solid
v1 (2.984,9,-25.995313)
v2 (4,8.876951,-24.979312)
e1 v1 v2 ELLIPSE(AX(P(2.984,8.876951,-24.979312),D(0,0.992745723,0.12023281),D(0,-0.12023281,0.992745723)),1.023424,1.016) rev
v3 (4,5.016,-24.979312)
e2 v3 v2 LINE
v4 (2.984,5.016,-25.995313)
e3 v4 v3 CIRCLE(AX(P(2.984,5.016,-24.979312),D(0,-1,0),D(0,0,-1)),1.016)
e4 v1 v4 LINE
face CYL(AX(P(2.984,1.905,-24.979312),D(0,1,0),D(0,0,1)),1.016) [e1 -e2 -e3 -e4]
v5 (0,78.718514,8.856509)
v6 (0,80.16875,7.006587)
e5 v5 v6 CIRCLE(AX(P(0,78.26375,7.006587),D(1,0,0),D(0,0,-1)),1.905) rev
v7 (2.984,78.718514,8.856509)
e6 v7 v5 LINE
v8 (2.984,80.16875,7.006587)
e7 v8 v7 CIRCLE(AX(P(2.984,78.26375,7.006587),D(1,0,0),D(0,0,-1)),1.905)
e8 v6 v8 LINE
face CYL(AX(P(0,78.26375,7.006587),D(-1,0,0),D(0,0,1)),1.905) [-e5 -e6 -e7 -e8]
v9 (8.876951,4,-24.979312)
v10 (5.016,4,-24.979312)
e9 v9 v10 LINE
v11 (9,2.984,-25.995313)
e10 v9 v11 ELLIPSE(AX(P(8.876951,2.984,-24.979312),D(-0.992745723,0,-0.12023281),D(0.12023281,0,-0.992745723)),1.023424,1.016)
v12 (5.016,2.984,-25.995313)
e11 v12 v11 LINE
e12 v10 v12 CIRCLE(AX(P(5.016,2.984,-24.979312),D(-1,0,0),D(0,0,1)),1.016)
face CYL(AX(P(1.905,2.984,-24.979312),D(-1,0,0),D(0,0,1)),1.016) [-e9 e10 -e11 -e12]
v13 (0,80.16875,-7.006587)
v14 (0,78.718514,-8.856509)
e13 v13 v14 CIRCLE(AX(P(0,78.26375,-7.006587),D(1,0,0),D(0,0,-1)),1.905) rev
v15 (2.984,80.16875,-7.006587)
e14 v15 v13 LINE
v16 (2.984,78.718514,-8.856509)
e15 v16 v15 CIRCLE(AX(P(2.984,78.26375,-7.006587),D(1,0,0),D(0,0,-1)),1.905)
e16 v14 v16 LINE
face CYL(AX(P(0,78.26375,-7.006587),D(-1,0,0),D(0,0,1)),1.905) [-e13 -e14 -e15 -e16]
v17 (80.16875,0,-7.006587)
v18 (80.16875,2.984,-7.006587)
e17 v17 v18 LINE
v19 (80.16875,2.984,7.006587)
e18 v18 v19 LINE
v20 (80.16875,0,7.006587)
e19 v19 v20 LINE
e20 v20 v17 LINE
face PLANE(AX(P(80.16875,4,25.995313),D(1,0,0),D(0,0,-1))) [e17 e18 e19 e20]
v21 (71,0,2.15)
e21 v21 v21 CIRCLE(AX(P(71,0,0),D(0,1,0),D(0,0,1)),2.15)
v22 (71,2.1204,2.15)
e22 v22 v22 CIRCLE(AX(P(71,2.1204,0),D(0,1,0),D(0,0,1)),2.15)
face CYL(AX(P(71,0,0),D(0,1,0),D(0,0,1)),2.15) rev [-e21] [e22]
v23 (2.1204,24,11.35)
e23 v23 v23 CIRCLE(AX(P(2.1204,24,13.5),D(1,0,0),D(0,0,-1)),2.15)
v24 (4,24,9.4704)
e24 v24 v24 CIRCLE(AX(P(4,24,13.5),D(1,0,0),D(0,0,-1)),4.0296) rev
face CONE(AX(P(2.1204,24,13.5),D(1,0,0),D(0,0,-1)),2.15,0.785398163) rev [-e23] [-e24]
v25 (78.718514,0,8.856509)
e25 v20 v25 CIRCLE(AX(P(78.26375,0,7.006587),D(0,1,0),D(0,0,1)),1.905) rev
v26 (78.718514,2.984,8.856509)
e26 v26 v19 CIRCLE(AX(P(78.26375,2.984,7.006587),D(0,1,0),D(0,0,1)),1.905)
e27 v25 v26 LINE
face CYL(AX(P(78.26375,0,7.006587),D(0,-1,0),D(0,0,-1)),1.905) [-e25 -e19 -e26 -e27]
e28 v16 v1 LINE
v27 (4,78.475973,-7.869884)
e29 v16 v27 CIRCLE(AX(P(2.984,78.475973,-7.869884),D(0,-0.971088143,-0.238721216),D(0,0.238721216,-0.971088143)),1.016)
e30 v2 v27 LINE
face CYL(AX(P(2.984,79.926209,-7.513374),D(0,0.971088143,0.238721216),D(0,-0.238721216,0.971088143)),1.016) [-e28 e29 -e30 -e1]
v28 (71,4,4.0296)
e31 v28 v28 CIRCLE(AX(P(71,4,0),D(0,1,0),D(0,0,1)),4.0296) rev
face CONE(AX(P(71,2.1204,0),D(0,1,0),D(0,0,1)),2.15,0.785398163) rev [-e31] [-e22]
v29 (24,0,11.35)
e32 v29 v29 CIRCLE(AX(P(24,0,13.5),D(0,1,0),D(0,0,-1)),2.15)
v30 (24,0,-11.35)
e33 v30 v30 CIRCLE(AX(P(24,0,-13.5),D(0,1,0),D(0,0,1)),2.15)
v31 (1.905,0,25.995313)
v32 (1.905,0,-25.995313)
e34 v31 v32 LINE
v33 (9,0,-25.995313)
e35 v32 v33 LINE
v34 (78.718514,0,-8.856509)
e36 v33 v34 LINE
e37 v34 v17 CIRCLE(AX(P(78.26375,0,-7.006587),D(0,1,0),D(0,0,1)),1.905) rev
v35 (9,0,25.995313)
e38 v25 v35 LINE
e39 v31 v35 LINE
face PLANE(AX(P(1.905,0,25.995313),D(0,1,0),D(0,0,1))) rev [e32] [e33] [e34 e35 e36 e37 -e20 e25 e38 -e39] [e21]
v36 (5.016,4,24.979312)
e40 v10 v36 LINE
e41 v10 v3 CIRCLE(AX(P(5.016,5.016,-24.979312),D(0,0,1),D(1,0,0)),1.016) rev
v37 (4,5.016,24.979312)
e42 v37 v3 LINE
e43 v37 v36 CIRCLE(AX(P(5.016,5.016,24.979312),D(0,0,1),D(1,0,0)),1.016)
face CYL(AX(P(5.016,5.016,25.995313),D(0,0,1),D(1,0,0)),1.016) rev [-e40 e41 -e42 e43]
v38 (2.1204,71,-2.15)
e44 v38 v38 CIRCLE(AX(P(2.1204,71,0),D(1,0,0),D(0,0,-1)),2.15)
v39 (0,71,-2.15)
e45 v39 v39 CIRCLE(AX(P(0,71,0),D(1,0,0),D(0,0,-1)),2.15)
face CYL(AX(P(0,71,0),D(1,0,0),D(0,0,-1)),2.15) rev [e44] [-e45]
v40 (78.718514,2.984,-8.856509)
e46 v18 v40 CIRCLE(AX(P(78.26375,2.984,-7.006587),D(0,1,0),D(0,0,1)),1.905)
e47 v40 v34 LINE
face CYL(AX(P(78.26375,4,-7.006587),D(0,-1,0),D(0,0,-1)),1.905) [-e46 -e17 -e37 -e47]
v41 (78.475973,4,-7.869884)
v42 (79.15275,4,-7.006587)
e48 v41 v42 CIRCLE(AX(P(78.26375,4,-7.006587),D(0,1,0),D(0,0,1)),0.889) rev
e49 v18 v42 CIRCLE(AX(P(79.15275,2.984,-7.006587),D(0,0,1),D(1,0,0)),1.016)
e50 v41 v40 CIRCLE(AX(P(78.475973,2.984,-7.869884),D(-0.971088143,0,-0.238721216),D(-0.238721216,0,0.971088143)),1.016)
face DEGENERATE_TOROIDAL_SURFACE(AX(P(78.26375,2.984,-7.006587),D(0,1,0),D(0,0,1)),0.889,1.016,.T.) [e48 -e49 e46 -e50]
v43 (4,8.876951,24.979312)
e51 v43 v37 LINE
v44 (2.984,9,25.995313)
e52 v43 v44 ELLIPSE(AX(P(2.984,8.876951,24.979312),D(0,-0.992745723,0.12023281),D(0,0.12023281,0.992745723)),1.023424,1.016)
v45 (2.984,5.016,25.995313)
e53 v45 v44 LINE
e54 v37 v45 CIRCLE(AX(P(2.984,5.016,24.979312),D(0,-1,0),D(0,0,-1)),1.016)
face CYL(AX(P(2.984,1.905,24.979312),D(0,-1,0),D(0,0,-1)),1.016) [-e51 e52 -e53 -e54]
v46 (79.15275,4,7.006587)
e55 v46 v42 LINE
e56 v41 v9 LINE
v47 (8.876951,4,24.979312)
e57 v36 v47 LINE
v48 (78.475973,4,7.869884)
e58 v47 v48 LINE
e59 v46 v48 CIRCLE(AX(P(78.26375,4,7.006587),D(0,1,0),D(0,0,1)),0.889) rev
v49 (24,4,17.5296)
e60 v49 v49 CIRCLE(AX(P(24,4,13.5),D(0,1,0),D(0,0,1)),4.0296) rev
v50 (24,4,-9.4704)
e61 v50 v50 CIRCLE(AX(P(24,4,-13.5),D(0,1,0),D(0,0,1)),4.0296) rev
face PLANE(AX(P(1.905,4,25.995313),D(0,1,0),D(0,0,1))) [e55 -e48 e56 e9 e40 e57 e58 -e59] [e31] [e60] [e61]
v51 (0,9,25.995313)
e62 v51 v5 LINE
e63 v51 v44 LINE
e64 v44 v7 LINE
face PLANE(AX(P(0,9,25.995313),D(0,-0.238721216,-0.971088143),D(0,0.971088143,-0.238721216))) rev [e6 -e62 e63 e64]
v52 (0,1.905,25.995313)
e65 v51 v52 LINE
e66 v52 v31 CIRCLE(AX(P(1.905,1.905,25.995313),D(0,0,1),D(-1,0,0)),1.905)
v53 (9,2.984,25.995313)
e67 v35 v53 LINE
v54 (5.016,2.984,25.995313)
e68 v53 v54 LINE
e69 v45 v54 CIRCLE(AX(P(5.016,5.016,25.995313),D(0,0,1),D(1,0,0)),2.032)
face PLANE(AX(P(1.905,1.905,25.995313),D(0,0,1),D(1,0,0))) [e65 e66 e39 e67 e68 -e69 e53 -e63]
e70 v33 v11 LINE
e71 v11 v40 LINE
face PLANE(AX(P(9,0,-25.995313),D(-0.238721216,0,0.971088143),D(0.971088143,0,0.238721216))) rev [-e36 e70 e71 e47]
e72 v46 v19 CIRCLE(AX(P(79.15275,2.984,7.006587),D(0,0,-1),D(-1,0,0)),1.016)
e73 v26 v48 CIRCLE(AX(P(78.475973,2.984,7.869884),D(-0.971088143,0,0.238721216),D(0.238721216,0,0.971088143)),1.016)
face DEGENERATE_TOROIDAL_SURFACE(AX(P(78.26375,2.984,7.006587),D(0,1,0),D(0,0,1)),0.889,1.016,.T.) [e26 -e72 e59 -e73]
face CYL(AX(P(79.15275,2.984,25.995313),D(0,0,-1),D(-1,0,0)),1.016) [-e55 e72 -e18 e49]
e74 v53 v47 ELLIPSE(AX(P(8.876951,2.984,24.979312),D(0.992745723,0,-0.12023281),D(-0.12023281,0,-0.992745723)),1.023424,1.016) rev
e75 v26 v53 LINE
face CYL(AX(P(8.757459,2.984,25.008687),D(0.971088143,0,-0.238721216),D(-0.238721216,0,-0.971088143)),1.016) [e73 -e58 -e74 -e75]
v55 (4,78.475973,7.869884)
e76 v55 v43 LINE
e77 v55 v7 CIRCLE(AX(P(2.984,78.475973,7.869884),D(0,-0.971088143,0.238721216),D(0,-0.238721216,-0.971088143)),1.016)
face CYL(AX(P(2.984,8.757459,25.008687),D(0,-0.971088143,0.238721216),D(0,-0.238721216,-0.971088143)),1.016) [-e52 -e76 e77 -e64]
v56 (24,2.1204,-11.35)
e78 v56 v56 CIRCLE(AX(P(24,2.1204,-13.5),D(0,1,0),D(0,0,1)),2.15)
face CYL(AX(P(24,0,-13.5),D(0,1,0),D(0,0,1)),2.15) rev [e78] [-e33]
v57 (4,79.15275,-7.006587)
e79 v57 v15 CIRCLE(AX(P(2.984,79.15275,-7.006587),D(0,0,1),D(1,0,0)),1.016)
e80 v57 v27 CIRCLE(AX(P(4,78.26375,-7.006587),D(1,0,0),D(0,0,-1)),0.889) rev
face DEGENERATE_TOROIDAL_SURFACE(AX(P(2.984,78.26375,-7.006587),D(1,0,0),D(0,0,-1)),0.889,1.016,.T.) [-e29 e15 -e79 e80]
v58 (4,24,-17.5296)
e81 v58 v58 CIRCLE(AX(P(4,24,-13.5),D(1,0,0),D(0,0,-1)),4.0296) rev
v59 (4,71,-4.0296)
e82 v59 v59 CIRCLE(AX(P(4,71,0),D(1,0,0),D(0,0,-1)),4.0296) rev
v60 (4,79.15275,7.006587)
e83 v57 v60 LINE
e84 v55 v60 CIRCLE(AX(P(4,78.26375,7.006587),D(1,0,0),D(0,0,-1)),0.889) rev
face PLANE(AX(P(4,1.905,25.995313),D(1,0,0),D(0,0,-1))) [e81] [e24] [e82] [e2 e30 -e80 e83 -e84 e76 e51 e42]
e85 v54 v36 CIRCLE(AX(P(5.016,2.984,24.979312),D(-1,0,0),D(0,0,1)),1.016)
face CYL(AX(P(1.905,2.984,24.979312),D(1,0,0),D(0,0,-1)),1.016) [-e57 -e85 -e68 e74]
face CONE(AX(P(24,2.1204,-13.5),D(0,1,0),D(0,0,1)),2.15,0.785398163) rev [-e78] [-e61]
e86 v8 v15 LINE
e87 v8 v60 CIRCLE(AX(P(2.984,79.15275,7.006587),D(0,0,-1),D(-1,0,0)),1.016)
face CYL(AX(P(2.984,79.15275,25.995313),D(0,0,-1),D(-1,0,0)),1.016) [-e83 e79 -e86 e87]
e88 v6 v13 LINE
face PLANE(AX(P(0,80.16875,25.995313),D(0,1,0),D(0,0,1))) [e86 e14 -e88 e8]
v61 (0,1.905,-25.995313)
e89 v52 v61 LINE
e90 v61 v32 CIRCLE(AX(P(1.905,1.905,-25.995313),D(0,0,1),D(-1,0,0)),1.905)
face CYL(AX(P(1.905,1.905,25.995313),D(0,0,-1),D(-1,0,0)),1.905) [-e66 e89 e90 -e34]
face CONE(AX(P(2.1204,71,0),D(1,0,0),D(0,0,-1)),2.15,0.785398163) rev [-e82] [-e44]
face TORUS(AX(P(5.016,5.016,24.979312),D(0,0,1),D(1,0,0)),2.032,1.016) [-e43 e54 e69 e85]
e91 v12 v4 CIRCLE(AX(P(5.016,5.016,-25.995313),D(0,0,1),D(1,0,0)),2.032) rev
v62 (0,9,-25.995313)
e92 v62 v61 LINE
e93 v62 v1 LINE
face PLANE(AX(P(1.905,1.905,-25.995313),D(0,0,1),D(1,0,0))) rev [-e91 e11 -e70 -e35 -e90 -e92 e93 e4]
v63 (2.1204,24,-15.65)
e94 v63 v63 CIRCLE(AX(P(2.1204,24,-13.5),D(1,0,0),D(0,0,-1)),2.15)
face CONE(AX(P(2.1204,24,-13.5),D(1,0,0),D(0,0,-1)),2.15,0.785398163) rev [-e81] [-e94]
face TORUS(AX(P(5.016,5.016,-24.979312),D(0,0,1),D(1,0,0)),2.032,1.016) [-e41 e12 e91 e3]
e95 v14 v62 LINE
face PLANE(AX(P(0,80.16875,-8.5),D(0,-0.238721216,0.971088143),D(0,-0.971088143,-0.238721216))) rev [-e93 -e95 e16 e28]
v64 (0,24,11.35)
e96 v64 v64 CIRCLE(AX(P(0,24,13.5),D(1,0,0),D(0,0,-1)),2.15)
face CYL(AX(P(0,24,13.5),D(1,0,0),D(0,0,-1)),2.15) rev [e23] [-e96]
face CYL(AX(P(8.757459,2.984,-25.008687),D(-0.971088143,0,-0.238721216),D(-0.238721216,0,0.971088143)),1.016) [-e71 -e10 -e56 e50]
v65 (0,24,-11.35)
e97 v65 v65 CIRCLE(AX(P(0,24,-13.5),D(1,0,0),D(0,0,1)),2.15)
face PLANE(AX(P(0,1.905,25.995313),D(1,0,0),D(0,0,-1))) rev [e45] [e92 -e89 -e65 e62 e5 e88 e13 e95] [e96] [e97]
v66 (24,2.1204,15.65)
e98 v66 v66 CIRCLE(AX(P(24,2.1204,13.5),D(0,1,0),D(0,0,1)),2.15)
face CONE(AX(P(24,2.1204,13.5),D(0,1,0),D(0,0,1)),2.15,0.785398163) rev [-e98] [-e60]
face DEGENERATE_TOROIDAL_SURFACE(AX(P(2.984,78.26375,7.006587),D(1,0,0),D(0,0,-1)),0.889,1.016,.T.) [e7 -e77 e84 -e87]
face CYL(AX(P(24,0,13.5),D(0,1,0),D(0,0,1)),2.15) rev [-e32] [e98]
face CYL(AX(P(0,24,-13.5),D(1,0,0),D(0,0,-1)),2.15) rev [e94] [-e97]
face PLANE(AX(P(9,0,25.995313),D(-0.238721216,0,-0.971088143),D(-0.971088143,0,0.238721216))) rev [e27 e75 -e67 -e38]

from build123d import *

# Parameters (mm, degrees)
EXTRUDE_THIN2_DEPTH = 25.9953125
CUT_EXTRUDE1_DEPTH  = 114.59781347
CUT_EXTRUDE2_DEPTH  = 114.59781347
SKETCH5_R           = 2.15
CUT_EXTRUDE4_DEPTH  = 114.59781347
SKETCH4_R           = 2.15
CUT_EXTRUDE3_DEPTH  = 114.59781347
FILLET1_R           = 1.016
FILLET2_R           = 1.905
CHAMFER1_SIZE       = 1.8796


with BuildPart() as part:
    # Sketch1 → Extrude-Thin2 (new, symmetric)
    with BuildSketch(Plane.XY):
        with BuildLine():
            Line((80.16875, 0), (1.905, 0))
            ThreePointArc((1.905, 0), (0.557961582, 0.557961582), (0, 1.905))
            Line((0, 1.905), (0, 80.16875))
            Line((0, 80.16875), (4, 80.16875))
            Line((4, 80.16875), (4, 4))
            Line((4, 4), (80.16875, 4))
            Line((80.16875, 4), (80.16875, 0))
        make_face()
    extrude(amount=EXTRUDE_THIN2_DEPTH, both=True)

    # Sketch2 → Cut-Extrude1 (cut, through all)
    with BuildSketch(Plane(origin=(4, 0, 0), x_dir=(0, 0, -1), z_dir=(1, 0, 0))):
        Polygon((-8.5, 80.16875), (8.5, 80.16875), (25.9953125, 9), (38.1, 9), (38.1, 105.56875), (-38.1, 105.56875), (-38.1, 9), (-25.9953125, 9), align=None)
    extrude(amount=-CUT_EXTRUDE1_DEPTH, mode=Mode.SUBTRACT)

    # Sketch3 → Cut-Extrude2 (cut, through all)
    with BuildSketch(Plane(origin=(0, 4, 0), x_dir=(1, 0, 0), z_dir=(0, 1, 0))):
        Polygon((9, 25.9953125), (80.16875, 8.5), (80.16875, -8.5), (9, -25.9953125), (9, -38.1), (105.56875, -38.1), (105.56875, 38.1), (9, 38.1), align=None)
    extrude(amount=-CUT_EXTRUDE2_DEPTH, mode=Mode.SUBTRACT)

    # Sketch5 → Cut-Extrude4 (cut, through all)
    with BuildSketch(Plane(origin=(0, 4, 0), x_dir=(1, 0, 0), z_dir=(0, 1, 0))):
        with Locations(Location((71, 0, 0), (0, 0, 270))):
            Circle(SKETCH5_R)
        with Locations(Location((24, 13.5, 0), (0, 0, 270))):
            Circle(SKETCH5_R)
        with Locations(Location((24, -13.5, 0), (0, 0, 90))):
            Circle(SKETCH5_R)
    extrude(amount=-CUT_EXTRUDE4_DEPTH, mode=Mode.SUBTRACT)

    # Sketch4 → Cut-Extrude3 (cut, through all)
    with BuildSketch(Plane(origin=(4, 0, 0), x_dir=(0, 0, -1), z_dir=(1, 0, 0))):
        with Locations((0, 71)):
            Circle(SKETCH4_R)
        with Locations((-13.5, 24)):
            Circle(SKETCH4_R)
        with Locations(Location((13.5, 24, 0), (0, 0, 180))):
            Circle(SKETCH4_R)
    extrude(amount=-CUT_EXTRUDE3_DEPTH, mode=Mode.SUBTRACT)

    # Fillet1
    fillet1_edges = [part.edges().sort_by_distance(p)[0] for p in [
        (6.5, 4, 25.9953125),
        (4, 4, 0),
        (4, 6.5, -25.9953125),
        (4, 6.5, 25.9953125),
        (4, 80.16875, 0),
        (4, 44.584375, 17.24765625),
        (4, 44.584375, -17.24765625),
        (80.16875, 4, 0),
        (44.584375, 4, 17.24765625),
        (44.584375, 4, -17.24765625),
        (6.5, 4, -25.9953125),
    ]]
    fillet(fillet1_edges, radius=FILLET1_R)

    # Fillet2
    # the kernel refuses this fillet: 1.905 mm, written as the material it takes off along each edge
    with BuildSketch(Plane(origin=(78.26375, 4, 7.00658656), x_dir=(0.23872121575662697, 0, 0.9710881428313695), z_dir=(-0.9710881428313695, 0, 0.23872121575662697))) as fillet2_piece_1:
        with BuildLine():
            CenterArc((0.889, -1.016), 1.016, 0, 90)
            Line((1.905, -1.016), (1.905, 0))
            Line((1.905, 0), (0.889, 0))
        make_face()
    revolve(axis=Axis((78.26375, 4, 7.00658656), (0, 1, 0)), revolution_arc=76.188922225, mode=Mode.SUBTRACT)
    with BuildSketch(Plane(origin=(4, 78.26375, 7.00658656), x_dir=(0, 1, 0), z_dir=(0, 0, -1))) as fillet2_piece_2:
        with BuildLine():
            CenterArc((0.889, -1.016), 1.016, 0, 90)
            Line((1.905, -1.016), (1.905, 0))
            Line((1.905, 0), (0.889, 0))
        make_face()
    revolve(axis=Axis((4, 78.26375, 7.00658656), (1, 0, 0)), revolution_arc=76.188922225, mode=Mode.SUBTRACT)
    with BuildSketch(Plane(origin=(4, 78.26375, -7.00658656), x_dir=(0, 0.23872121575662691, -0.9710881428313693), z_dir=(0, -0.9710881428313693, -0.23872121575662691))) as fillet2_piece_3:
        with BuildLine():
            CenterArc((0.889, -1.016), 1.016, 0, 90)
            Line((1.905, -1.016), (1.905, 0))
            Line((1.905, 0), (0.889, 0))
        make_face()
    revolve(axis=Axis((4, 78.26375, -7.00658656), (1, 0, 0)), revolution_arc=76.188922225, mode=Mode.SUBTRACT)
    with BuildSketch(Plane(origin=(78.26375, 4, -7.00658656), x_dir=(1, 0, 0), z_dir=(0, 0, 1))) as fillet2_piece_4:
        with BuildLine():
            CenterArc((0.889, -1.016), 1.016, 0, 90)
            Line((1.905, -1.016), (1.905, 0))
            Line((1.905, 0), (0.889, 0))
        make_face()
    revolve(axis=Axis((78.26375, 4, -7.00658656), (0, 1, 0)), revolution_arc=76.188922225, mode=Mode.SUBTRACT)
    with BuildSketch(Plane(origin=(4, 80.16875, 8.5), x_dir=(0, -0.971088142831369, 0.23872121575662839), z_dir=(-1, 0, 0)), Plane(origin=(80.16875, 4, 8.5), x_dir=(0, 0, -1), z_dir=(0, -1, 0))) as fillet2_piece_5:
        with BuildLine():
            CenterArc((FILLET2_R * 0.783944063022, -FILLET2_R), FILLET2_R, 90, 76.188922225)
            Line((-FILLET2_R * 0.18714407981, -FILLET2_R * 0.761278784243), (0, 0))
            Line((0, 0), (FILLET2_R * 0.783944063022, 0))
        make_face()
    extrude(amount=7.7335336, mode=Mode.SUBTRACT)
    with BuildSketch(Plane(origin=(4, 80.16875, -8.5), x_dir=(0, -0.9710881428313692, -0.23872121575662728), z_dir=(-1, 0, 0)), Plane(origin=(80.16875, 4, -8.5), x_dir=(0, 0, 1), z_dir=(0, -1, 0))) as fillet2_piece_6:
        with BuildLine():
            CenterArc((FILLET2_R * 0.783944063022, FILLET2_R), FILLET2_R, 193.811077775, 76.188922225)
            Line((-FILLET2_R * 0.18714407981, FILLET2_R * 0.761278784243), (0, 0))
            Line((0, 0), (FILLET2_R * 0.783944063022, 0))
        make_face()
    extrude(amount=7.7335336, mode=Mode.SUBTRACT)

    # Chamfer1
    chamfer1_edges = [part.edges().sort_by_distance(p)[0] for p in [
        (71, 4, -2.15),
        (24, 4, -15.65),
        (24, 4, 15.65),
        (4, 71, 2.15),
        (4, 24, 15.65),
        (4, 24, -15.65),
    ]]
    chamfer(chamfer1_edges, length=CHAMFER1_SIZE)


solid = part.part
